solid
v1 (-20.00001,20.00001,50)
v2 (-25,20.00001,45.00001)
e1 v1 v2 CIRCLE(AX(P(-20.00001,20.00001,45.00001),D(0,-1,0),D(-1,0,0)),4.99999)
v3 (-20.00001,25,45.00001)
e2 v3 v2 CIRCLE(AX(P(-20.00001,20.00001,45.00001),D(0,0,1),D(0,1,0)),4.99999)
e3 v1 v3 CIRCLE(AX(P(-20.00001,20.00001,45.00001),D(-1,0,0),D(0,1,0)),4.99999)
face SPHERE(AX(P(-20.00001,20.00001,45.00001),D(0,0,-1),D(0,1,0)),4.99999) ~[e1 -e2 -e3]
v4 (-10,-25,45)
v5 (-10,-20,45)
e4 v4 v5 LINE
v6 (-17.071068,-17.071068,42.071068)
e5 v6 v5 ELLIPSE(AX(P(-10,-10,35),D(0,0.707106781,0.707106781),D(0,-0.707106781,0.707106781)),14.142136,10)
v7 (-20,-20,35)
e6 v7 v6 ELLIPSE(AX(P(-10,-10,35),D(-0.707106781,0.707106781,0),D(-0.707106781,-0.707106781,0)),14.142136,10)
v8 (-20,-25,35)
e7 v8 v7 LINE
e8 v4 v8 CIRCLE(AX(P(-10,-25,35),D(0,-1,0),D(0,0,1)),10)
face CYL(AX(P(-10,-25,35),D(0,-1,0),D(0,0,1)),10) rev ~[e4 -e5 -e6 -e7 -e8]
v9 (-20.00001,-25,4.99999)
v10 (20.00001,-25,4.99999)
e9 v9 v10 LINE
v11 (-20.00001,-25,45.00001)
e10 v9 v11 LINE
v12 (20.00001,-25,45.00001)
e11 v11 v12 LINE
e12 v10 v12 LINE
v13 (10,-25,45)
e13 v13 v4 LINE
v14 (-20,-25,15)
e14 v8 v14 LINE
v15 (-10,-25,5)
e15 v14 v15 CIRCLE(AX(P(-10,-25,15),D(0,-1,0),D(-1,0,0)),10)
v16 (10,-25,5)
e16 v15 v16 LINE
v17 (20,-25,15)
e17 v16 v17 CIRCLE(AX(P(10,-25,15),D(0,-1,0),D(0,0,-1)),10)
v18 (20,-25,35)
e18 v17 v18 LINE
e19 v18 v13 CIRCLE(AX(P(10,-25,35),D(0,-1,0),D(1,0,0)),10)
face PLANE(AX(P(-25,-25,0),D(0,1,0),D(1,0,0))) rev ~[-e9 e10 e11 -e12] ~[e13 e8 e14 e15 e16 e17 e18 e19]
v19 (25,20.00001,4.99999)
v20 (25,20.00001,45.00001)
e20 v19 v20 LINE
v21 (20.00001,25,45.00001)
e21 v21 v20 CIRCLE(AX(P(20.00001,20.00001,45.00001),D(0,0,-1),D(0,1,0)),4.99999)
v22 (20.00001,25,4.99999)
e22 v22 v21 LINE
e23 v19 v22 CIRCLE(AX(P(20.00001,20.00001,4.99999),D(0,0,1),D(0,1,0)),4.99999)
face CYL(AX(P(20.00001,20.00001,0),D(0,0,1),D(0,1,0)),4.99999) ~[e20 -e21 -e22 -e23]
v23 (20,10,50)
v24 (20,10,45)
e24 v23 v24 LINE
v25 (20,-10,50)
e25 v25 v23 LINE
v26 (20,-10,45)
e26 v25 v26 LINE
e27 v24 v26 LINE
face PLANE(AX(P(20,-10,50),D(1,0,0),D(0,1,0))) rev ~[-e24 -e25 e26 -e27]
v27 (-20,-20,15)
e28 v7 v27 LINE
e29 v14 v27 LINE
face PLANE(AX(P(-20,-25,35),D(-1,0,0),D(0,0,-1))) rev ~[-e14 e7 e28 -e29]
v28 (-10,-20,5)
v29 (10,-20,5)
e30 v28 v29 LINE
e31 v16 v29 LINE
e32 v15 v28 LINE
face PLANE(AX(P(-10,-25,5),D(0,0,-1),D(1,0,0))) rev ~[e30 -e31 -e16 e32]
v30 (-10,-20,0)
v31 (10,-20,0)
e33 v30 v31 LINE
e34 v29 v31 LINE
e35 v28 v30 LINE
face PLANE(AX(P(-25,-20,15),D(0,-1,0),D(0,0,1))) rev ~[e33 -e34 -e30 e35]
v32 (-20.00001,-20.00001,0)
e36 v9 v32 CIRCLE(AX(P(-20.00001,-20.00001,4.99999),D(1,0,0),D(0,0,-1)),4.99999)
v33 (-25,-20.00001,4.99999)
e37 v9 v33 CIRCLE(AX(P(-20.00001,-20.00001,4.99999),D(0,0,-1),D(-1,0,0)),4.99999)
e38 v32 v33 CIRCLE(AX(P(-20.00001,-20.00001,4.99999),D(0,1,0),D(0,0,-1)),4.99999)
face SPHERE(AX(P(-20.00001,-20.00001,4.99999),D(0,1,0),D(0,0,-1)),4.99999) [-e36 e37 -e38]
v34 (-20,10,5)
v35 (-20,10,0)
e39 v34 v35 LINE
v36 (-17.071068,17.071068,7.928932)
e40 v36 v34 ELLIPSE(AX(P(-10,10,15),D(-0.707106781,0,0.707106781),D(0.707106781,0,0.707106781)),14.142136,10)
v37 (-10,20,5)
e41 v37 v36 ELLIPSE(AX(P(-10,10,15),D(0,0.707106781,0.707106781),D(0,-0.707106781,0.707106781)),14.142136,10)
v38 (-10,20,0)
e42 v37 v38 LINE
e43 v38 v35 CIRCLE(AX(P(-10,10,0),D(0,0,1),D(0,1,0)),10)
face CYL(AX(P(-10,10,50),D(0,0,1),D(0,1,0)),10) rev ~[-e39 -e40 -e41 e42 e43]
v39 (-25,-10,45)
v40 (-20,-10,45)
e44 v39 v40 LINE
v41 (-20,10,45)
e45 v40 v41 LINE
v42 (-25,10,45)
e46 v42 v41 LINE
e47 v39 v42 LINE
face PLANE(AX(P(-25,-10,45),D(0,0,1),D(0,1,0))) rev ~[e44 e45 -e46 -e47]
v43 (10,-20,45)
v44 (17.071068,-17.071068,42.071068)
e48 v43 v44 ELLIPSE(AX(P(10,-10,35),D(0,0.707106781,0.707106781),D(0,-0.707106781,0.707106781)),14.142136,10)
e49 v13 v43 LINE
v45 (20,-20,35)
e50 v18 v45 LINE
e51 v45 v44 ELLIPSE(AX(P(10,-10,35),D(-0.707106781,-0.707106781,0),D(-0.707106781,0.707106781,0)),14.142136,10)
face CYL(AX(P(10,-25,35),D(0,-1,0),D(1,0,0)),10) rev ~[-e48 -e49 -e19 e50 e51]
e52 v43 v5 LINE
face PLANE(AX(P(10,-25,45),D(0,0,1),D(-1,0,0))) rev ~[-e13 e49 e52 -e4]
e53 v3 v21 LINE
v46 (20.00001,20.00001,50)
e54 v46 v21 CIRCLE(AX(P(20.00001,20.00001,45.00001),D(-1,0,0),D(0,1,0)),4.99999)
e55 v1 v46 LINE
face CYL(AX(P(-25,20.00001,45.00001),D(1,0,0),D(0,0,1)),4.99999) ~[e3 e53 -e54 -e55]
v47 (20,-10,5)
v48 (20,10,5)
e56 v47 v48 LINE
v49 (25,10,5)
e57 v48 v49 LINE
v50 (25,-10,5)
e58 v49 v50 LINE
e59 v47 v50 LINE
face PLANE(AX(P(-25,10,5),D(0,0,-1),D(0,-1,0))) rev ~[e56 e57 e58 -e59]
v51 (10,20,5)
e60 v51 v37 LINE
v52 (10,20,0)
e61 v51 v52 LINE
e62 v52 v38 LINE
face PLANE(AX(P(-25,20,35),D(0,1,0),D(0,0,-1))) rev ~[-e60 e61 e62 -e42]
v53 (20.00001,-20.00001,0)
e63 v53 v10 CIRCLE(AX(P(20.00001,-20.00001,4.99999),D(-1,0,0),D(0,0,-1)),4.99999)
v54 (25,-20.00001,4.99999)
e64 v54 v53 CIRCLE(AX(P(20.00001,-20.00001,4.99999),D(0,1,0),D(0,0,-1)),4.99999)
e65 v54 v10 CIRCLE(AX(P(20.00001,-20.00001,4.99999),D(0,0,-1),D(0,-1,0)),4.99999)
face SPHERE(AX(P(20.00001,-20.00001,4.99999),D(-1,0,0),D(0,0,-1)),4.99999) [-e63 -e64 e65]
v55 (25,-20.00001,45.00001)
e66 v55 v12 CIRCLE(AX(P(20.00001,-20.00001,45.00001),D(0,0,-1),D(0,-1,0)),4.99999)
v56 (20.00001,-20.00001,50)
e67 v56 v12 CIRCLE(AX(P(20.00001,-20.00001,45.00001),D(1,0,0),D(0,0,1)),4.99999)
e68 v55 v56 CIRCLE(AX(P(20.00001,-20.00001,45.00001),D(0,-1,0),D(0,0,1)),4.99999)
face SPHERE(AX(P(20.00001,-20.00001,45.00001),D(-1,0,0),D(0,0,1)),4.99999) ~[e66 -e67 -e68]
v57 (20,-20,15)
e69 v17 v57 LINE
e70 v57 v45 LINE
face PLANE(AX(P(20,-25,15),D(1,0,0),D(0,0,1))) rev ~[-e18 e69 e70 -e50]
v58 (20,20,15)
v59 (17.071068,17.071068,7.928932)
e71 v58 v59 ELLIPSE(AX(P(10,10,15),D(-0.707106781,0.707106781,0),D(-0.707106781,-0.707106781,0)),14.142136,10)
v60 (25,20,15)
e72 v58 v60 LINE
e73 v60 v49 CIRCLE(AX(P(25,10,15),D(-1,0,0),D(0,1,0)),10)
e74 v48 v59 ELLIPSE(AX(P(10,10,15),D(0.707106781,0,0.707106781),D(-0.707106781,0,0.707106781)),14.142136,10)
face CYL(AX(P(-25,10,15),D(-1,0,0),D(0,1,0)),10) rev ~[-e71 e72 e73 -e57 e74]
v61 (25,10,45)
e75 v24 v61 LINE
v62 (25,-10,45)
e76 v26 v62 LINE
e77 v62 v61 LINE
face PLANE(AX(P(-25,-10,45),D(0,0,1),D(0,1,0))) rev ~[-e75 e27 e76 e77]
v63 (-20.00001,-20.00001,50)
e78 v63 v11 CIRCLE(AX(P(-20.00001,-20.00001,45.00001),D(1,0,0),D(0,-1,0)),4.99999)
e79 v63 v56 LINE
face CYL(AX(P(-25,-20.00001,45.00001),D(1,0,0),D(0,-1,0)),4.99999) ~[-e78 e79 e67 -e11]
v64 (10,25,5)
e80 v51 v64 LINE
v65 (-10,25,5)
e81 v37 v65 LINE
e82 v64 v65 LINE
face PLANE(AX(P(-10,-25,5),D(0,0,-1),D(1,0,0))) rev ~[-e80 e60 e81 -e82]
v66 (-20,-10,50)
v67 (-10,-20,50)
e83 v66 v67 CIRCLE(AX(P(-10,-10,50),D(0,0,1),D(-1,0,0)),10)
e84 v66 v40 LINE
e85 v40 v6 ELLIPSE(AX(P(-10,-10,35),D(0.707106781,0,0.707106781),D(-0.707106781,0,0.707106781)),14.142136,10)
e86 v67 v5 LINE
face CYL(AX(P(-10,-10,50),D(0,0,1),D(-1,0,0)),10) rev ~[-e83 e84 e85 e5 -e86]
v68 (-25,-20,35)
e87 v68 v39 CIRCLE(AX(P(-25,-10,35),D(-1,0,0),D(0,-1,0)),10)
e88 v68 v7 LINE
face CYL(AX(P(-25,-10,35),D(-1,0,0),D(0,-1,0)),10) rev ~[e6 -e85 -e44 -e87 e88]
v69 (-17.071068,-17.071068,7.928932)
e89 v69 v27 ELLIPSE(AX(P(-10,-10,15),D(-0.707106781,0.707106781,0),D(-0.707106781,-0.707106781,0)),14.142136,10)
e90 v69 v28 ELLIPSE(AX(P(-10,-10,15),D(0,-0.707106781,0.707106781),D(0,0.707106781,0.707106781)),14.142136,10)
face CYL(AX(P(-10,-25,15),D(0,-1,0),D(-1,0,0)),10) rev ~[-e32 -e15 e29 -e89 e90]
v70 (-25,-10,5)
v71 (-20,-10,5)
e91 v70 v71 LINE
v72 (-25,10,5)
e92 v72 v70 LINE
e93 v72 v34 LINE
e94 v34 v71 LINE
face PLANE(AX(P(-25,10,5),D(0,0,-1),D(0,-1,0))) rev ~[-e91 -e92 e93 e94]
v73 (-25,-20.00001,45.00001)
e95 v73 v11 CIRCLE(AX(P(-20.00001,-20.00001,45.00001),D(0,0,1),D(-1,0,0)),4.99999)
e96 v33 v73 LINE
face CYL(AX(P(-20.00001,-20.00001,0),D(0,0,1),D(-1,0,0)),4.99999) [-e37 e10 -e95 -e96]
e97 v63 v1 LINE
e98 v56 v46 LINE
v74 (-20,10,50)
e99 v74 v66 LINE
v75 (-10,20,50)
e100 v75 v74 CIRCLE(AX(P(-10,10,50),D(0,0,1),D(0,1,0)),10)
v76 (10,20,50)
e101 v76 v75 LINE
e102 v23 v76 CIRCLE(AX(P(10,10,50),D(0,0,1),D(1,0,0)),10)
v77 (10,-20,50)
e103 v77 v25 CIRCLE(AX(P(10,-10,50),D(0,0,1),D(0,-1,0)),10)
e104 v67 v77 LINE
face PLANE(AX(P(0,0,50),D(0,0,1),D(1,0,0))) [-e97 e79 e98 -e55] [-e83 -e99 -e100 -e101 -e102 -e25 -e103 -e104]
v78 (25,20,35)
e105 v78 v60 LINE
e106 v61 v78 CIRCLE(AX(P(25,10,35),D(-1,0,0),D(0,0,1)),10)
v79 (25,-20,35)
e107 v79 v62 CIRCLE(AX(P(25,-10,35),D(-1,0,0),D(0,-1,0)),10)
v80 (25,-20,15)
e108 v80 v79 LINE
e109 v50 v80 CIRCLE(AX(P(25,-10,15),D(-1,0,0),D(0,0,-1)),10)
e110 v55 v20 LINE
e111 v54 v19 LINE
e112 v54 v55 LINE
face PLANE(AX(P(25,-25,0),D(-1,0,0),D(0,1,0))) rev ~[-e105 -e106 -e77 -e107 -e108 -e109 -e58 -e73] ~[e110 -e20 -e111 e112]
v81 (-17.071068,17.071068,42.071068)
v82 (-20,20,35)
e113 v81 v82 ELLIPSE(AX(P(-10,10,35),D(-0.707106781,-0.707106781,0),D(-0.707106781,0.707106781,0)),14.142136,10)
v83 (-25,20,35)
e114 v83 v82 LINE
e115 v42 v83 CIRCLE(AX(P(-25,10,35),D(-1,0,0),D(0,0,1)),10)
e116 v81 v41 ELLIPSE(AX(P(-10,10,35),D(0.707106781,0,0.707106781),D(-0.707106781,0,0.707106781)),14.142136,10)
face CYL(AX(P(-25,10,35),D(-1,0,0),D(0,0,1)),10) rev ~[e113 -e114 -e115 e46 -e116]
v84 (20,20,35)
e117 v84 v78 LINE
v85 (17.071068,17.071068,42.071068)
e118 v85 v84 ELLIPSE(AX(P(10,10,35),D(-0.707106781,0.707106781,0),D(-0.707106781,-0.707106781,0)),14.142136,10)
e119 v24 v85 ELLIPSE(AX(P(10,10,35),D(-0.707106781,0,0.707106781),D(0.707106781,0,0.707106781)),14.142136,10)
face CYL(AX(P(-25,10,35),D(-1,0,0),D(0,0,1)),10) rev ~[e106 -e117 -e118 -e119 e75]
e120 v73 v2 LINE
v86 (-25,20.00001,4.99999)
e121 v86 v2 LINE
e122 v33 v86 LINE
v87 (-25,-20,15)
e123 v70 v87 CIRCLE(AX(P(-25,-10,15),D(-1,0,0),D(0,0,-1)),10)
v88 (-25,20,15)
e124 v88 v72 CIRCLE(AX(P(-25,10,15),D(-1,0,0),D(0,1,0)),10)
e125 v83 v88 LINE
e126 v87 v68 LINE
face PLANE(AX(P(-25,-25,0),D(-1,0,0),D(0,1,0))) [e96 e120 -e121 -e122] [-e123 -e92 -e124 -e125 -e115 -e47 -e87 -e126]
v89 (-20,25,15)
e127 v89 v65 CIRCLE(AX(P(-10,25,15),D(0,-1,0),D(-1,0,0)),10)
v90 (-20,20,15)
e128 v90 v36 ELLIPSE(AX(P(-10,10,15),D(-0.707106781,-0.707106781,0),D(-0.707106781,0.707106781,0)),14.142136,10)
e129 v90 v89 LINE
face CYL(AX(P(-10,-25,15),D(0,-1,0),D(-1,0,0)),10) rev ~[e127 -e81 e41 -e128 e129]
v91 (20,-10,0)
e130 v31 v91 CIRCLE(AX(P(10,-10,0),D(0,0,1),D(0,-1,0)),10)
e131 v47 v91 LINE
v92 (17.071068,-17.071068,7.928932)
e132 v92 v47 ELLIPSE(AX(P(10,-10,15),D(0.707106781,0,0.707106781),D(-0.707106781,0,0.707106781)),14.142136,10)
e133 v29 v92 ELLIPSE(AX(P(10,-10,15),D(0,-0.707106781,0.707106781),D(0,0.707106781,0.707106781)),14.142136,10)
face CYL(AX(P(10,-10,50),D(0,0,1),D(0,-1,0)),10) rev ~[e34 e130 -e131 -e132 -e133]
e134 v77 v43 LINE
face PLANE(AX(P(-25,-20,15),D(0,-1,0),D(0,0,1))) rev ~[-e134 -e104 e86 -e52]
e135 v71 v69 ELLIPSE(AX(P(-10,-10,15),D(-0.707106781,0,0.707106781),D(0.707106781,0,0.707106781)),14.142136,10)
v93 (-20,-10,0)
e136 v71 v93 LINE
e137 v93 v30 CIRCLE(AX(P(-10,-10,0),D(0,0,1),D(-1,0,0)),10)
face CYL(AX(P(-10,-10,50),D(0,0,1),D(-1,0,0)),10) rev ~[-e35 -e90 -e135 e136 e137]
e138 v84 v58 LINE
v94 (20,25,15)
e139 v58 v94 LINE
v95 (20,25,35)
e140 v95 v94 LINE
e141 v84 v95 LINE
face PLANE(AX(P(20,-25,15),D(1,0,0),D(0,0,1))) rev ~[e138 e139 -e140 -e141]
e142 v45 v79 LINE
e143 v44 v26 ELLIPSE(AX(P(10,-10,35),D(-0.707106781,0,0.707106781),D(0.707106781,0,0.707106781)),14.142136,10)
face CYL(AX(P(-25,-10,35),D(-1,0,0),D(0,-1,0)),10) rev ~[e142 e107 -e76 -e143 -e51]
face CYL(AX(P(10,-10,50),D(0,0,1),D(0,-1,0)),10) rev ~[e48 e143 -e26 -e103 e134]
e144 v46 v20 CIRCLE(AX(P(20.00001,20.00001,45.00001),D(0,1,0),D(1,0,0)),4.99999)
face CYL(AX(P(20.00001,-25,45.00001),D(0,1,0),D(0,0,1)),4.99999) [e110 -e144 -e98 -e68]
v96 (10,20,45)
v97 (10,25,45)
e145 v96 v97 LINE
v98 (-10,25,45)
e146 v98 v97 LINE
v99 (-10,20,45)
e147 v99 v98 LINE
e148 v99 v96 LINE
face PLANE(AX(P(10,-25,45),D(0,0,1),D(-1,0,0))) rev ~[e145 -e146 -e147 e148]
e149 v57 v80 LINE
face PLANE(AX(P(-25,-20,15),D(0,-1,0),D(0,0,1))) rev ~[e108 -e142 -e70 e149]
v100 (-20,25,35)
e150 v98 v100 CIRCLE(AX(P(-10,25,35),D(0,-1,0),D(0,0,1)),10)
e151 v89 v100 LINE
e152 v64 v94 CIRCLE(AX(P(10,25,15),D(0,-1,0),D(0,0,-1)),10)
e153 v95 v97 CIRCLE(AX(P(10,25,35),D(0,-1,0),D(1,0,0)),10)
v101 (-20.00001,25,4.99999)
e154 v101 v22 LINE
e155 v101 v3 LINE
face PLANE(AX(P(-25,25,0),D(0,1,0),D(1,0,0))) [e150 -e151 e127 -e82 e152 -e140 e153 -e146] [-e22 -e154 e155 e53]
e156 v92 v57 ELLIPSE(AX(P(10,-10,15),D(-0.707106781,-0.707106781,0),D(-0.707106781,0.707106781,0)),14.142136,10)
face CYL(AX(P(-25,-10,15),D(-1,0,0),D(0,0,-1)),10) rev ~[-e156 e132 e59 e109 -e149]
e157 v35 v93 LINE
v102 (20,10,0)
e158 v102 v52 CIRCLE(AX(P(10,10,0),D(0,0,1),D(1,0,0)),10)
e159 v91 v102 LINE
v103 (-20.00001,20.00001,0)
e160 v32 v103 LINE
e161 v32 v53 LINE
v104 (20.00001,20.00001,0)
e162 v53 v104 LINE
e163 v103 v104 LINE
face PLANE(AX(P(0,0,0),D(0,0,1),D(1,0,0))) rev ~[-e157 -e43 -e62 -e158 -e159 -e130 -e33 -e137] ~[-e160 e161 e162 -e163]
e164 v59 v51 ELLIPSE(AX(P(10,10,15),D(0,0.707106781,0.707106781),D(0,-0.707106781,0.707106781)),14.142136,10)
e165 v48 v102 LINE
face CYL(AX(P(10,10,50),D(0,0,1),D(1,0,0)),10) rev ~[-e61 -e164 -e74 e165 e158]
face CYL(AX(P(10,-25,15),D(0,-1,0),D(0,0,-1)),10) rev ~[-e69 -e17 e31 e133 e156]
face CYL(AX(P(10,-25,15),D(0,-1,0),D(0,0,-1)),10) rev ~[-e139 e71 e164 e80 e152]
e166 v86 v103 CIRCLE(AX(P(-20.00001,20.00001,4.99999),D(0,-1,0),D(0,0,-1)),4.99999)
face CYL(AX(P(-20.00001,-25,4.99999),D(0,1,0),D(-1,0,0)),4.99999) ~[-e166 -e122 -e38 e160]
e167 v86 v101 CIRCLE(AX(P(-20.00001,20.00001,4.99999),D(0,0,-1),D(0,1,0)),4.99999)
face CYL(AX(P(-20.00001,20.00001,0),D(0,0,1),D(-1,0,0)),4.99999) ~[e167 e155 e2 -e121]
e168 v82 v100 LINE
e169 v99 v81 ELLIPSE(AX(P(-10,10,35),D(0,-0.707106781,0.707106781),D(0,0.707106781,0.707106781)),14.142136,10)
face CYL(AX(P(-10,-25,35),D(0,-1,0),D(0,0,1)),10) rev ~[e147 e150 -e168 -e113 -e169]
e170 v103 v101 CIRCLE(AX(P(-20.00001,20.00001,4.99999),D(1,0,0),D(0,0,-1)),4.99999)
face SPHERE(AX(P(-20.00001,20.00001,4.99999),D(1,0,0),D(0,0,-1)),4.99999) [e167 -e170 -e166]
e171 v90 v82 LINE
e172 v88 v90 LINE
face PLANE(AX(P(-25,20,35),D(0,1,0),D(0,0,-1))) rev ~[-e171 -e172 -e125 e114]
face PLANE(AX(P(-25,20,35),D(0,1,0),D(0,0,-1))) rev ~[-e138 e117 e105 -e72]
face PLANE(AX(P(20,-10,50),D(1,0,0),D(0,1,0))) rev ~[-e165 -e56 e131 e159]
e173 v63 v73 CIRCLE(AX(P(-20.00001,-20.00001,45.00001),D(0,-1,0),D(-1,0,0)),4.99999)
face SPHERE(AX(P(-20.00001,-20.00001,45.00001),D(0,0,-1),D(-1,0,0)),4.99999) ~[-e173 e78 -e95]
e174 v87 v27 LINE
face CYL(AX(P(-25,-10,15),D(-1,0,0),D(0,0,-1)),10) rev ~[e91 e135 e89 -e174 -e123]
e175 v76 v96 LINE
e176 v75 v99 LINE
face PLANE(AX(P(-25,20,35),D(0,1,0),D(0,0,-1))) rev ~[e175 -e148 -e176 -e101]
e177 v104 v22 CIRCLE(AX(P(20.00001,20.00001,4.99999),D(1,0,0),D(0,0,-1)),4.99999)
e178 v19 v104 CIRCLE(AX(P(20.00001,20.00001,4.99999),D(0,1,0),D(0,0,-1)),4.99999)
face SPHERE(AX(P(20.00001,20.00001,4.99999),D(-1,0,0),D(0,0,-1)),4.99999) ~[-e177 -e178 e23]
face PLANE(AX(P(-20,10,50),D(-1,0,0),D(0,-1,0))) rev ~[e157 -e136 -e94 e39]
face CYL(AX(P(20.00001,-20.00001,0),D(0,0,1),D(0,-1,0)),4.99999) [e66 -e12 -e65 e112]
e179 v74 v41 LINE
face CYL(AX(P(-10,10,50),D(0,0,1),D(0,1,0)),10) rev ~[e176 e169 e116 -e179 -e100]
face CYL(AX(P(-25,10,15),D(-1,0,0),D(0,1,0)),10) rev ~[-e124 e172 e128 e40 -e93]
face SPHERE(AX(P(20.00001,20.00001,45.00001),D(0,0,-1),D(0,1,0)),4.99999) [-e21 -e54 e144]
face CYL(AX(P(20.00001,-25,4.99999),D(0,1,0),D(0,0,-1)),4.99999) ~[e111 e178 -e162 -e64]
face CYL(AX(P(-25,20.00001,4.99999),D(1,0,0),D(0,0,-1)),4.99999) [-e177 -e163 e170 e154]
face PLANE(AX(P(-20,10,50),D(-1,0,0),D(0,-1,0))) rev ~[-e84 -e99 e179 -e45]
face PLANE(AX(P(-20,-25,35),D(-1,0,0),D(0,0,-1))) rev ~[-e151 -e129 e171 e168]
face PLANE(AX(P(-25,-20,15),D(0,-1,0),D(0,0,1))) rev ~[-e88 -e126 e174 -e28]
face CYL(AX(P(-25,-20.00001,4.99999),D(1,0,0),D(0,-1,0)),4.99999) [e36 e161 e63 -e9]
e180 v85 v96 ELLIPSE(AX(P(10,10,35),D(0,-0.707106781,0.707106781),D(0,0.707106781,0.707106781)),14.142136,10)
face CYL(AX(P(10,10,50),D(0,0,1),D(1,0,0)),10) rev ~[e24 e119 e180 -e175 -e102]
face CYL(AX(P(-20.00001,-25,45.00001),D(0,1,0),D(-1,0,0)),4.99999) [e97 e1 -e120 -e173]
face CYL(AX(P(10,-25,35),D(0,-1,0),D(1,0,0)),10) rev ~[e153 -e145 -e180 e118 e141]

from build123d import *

# Parameters (mm, degrees)
F0_W     = 50
F0_H     = 50
F1_DEPTH = 50
F3_DEPTH = 50.001
F5_DEPTH = 50.001
F7_DEPTH = 50.001
F8_R     = 4.99999


# Not quite as in the source:
# - a fillet or chamfer is up to 0.001 mm smaller than in the source, because OpenCascade refuses the exact size


with BuildPart() as f1:
    # F0 (on Top) → F1 (new body)
    with BuildSketch(Plane.XY):
        Rectangle(F0_W, F0_H)
    extrude(amount=F1_DEPTH)

    # F2 (on face) → F3 (cut, through all)
    with BuildSketch(Plane.XY.offset(50)):
        with BuildLine():
            ThreePointArc((20, 10), (17.0710678119, 17.0710678119), (10, 20))
            Line((10, 20), (-10, 20))
            ThreePointArc((-10, 20), (-17.0710678119, 17.0710678119), (-20, 10))
            Line((-20, 10), (-20, -10))
            ThreePointArc((-20, -10), (-17.0710678119, -17.0710678119), (-10, -20))
            Line((-10, -20), (10, -20))
            ThreePointArc((10, -20), (17.0710678119, -17.0710678119), (20, -10))
            Line((20, -10), (20, 10))
        make_face()
    extrude(amount=-F3_DEPTH, mode=Mode.SUBTRACT)

    # F4 (on face) → F5 (cut, through all)
    with BuildSketch(Plane(origin=(-25, 0, 0), x_dir=(0, -1, 0), z_dir=(-1, 0, 0))):
        with BuildLine():
            Line((10, 45), (-10, 45))
            ThreePointArc((-10, 45), (-17.0710678119, 42.0710678119), (-20, 35))
            Line((-20, 35), (-20, 15))
            ThreePointArc((-20, 15), (-17.0710678119, 7.9289321881), (-10, 5))
            Line((-10, 5), (10, 5))
            ThreePointArc((10, 5), (17.0710678119, 7.9289321881), (20, 15))
            Line((20, 15), (20, 35))
            ThreePointArc((20, 35), (17.0710678119, 42.0710678119), (10, 45))
        make_face()
    extrude(amount=-F5_DEPTH, mode=Mode.SUBTRACT)

    # F6 (on face) → F7 (cut, through all)
    with BuildSketch(Plane.XZ.offset(25)):
        with BuildLine():
            Line((10, 45), (-10, 45))
            ThreePointArc((-10, 45), (-17.0710678119, 42.0710678119), (-20, 35))
            Line((-20, 35), (-20, 15))
            ThreePointArc((-20, 15), (-17.0710678119, 7.9289321881), (-10, 5))
            Line((-10, 5), (10, 5))
            ThreePointArc((10, 5), (17.0710678119, 7.9289321881), (20, 15))
            Line((20, 15), (20, 35))
            ThreePointArc((20, 35), (17.0710678119, 42.0710678119), (10, 45))
        make_face()
    extrude(amount=-F7_DEPTH, mode=Mode.SUBTRACT)

    # F8 (radius 5 in the source; OpenCascade refuses exactly that, so slightly less here)
    f8_edges = [f1.edges().sort_by_distance(p)[0] for p in [
        (0, 25, 0),
        (-25, 0, 0),
        (0, -25, 0),
        (25, 0, 0),
        (25, 25, 25),
        (-25, 25, 25),
        (-25, -25, 25),
        (0, 25, 50),
        (-25, 0, 50),
        (0, -25, 50),
        (25, 0, 50),
        (25, -25, 25),
    ]]
    fillet(f8_edges, radius=F8_R)


solid = f1.part
